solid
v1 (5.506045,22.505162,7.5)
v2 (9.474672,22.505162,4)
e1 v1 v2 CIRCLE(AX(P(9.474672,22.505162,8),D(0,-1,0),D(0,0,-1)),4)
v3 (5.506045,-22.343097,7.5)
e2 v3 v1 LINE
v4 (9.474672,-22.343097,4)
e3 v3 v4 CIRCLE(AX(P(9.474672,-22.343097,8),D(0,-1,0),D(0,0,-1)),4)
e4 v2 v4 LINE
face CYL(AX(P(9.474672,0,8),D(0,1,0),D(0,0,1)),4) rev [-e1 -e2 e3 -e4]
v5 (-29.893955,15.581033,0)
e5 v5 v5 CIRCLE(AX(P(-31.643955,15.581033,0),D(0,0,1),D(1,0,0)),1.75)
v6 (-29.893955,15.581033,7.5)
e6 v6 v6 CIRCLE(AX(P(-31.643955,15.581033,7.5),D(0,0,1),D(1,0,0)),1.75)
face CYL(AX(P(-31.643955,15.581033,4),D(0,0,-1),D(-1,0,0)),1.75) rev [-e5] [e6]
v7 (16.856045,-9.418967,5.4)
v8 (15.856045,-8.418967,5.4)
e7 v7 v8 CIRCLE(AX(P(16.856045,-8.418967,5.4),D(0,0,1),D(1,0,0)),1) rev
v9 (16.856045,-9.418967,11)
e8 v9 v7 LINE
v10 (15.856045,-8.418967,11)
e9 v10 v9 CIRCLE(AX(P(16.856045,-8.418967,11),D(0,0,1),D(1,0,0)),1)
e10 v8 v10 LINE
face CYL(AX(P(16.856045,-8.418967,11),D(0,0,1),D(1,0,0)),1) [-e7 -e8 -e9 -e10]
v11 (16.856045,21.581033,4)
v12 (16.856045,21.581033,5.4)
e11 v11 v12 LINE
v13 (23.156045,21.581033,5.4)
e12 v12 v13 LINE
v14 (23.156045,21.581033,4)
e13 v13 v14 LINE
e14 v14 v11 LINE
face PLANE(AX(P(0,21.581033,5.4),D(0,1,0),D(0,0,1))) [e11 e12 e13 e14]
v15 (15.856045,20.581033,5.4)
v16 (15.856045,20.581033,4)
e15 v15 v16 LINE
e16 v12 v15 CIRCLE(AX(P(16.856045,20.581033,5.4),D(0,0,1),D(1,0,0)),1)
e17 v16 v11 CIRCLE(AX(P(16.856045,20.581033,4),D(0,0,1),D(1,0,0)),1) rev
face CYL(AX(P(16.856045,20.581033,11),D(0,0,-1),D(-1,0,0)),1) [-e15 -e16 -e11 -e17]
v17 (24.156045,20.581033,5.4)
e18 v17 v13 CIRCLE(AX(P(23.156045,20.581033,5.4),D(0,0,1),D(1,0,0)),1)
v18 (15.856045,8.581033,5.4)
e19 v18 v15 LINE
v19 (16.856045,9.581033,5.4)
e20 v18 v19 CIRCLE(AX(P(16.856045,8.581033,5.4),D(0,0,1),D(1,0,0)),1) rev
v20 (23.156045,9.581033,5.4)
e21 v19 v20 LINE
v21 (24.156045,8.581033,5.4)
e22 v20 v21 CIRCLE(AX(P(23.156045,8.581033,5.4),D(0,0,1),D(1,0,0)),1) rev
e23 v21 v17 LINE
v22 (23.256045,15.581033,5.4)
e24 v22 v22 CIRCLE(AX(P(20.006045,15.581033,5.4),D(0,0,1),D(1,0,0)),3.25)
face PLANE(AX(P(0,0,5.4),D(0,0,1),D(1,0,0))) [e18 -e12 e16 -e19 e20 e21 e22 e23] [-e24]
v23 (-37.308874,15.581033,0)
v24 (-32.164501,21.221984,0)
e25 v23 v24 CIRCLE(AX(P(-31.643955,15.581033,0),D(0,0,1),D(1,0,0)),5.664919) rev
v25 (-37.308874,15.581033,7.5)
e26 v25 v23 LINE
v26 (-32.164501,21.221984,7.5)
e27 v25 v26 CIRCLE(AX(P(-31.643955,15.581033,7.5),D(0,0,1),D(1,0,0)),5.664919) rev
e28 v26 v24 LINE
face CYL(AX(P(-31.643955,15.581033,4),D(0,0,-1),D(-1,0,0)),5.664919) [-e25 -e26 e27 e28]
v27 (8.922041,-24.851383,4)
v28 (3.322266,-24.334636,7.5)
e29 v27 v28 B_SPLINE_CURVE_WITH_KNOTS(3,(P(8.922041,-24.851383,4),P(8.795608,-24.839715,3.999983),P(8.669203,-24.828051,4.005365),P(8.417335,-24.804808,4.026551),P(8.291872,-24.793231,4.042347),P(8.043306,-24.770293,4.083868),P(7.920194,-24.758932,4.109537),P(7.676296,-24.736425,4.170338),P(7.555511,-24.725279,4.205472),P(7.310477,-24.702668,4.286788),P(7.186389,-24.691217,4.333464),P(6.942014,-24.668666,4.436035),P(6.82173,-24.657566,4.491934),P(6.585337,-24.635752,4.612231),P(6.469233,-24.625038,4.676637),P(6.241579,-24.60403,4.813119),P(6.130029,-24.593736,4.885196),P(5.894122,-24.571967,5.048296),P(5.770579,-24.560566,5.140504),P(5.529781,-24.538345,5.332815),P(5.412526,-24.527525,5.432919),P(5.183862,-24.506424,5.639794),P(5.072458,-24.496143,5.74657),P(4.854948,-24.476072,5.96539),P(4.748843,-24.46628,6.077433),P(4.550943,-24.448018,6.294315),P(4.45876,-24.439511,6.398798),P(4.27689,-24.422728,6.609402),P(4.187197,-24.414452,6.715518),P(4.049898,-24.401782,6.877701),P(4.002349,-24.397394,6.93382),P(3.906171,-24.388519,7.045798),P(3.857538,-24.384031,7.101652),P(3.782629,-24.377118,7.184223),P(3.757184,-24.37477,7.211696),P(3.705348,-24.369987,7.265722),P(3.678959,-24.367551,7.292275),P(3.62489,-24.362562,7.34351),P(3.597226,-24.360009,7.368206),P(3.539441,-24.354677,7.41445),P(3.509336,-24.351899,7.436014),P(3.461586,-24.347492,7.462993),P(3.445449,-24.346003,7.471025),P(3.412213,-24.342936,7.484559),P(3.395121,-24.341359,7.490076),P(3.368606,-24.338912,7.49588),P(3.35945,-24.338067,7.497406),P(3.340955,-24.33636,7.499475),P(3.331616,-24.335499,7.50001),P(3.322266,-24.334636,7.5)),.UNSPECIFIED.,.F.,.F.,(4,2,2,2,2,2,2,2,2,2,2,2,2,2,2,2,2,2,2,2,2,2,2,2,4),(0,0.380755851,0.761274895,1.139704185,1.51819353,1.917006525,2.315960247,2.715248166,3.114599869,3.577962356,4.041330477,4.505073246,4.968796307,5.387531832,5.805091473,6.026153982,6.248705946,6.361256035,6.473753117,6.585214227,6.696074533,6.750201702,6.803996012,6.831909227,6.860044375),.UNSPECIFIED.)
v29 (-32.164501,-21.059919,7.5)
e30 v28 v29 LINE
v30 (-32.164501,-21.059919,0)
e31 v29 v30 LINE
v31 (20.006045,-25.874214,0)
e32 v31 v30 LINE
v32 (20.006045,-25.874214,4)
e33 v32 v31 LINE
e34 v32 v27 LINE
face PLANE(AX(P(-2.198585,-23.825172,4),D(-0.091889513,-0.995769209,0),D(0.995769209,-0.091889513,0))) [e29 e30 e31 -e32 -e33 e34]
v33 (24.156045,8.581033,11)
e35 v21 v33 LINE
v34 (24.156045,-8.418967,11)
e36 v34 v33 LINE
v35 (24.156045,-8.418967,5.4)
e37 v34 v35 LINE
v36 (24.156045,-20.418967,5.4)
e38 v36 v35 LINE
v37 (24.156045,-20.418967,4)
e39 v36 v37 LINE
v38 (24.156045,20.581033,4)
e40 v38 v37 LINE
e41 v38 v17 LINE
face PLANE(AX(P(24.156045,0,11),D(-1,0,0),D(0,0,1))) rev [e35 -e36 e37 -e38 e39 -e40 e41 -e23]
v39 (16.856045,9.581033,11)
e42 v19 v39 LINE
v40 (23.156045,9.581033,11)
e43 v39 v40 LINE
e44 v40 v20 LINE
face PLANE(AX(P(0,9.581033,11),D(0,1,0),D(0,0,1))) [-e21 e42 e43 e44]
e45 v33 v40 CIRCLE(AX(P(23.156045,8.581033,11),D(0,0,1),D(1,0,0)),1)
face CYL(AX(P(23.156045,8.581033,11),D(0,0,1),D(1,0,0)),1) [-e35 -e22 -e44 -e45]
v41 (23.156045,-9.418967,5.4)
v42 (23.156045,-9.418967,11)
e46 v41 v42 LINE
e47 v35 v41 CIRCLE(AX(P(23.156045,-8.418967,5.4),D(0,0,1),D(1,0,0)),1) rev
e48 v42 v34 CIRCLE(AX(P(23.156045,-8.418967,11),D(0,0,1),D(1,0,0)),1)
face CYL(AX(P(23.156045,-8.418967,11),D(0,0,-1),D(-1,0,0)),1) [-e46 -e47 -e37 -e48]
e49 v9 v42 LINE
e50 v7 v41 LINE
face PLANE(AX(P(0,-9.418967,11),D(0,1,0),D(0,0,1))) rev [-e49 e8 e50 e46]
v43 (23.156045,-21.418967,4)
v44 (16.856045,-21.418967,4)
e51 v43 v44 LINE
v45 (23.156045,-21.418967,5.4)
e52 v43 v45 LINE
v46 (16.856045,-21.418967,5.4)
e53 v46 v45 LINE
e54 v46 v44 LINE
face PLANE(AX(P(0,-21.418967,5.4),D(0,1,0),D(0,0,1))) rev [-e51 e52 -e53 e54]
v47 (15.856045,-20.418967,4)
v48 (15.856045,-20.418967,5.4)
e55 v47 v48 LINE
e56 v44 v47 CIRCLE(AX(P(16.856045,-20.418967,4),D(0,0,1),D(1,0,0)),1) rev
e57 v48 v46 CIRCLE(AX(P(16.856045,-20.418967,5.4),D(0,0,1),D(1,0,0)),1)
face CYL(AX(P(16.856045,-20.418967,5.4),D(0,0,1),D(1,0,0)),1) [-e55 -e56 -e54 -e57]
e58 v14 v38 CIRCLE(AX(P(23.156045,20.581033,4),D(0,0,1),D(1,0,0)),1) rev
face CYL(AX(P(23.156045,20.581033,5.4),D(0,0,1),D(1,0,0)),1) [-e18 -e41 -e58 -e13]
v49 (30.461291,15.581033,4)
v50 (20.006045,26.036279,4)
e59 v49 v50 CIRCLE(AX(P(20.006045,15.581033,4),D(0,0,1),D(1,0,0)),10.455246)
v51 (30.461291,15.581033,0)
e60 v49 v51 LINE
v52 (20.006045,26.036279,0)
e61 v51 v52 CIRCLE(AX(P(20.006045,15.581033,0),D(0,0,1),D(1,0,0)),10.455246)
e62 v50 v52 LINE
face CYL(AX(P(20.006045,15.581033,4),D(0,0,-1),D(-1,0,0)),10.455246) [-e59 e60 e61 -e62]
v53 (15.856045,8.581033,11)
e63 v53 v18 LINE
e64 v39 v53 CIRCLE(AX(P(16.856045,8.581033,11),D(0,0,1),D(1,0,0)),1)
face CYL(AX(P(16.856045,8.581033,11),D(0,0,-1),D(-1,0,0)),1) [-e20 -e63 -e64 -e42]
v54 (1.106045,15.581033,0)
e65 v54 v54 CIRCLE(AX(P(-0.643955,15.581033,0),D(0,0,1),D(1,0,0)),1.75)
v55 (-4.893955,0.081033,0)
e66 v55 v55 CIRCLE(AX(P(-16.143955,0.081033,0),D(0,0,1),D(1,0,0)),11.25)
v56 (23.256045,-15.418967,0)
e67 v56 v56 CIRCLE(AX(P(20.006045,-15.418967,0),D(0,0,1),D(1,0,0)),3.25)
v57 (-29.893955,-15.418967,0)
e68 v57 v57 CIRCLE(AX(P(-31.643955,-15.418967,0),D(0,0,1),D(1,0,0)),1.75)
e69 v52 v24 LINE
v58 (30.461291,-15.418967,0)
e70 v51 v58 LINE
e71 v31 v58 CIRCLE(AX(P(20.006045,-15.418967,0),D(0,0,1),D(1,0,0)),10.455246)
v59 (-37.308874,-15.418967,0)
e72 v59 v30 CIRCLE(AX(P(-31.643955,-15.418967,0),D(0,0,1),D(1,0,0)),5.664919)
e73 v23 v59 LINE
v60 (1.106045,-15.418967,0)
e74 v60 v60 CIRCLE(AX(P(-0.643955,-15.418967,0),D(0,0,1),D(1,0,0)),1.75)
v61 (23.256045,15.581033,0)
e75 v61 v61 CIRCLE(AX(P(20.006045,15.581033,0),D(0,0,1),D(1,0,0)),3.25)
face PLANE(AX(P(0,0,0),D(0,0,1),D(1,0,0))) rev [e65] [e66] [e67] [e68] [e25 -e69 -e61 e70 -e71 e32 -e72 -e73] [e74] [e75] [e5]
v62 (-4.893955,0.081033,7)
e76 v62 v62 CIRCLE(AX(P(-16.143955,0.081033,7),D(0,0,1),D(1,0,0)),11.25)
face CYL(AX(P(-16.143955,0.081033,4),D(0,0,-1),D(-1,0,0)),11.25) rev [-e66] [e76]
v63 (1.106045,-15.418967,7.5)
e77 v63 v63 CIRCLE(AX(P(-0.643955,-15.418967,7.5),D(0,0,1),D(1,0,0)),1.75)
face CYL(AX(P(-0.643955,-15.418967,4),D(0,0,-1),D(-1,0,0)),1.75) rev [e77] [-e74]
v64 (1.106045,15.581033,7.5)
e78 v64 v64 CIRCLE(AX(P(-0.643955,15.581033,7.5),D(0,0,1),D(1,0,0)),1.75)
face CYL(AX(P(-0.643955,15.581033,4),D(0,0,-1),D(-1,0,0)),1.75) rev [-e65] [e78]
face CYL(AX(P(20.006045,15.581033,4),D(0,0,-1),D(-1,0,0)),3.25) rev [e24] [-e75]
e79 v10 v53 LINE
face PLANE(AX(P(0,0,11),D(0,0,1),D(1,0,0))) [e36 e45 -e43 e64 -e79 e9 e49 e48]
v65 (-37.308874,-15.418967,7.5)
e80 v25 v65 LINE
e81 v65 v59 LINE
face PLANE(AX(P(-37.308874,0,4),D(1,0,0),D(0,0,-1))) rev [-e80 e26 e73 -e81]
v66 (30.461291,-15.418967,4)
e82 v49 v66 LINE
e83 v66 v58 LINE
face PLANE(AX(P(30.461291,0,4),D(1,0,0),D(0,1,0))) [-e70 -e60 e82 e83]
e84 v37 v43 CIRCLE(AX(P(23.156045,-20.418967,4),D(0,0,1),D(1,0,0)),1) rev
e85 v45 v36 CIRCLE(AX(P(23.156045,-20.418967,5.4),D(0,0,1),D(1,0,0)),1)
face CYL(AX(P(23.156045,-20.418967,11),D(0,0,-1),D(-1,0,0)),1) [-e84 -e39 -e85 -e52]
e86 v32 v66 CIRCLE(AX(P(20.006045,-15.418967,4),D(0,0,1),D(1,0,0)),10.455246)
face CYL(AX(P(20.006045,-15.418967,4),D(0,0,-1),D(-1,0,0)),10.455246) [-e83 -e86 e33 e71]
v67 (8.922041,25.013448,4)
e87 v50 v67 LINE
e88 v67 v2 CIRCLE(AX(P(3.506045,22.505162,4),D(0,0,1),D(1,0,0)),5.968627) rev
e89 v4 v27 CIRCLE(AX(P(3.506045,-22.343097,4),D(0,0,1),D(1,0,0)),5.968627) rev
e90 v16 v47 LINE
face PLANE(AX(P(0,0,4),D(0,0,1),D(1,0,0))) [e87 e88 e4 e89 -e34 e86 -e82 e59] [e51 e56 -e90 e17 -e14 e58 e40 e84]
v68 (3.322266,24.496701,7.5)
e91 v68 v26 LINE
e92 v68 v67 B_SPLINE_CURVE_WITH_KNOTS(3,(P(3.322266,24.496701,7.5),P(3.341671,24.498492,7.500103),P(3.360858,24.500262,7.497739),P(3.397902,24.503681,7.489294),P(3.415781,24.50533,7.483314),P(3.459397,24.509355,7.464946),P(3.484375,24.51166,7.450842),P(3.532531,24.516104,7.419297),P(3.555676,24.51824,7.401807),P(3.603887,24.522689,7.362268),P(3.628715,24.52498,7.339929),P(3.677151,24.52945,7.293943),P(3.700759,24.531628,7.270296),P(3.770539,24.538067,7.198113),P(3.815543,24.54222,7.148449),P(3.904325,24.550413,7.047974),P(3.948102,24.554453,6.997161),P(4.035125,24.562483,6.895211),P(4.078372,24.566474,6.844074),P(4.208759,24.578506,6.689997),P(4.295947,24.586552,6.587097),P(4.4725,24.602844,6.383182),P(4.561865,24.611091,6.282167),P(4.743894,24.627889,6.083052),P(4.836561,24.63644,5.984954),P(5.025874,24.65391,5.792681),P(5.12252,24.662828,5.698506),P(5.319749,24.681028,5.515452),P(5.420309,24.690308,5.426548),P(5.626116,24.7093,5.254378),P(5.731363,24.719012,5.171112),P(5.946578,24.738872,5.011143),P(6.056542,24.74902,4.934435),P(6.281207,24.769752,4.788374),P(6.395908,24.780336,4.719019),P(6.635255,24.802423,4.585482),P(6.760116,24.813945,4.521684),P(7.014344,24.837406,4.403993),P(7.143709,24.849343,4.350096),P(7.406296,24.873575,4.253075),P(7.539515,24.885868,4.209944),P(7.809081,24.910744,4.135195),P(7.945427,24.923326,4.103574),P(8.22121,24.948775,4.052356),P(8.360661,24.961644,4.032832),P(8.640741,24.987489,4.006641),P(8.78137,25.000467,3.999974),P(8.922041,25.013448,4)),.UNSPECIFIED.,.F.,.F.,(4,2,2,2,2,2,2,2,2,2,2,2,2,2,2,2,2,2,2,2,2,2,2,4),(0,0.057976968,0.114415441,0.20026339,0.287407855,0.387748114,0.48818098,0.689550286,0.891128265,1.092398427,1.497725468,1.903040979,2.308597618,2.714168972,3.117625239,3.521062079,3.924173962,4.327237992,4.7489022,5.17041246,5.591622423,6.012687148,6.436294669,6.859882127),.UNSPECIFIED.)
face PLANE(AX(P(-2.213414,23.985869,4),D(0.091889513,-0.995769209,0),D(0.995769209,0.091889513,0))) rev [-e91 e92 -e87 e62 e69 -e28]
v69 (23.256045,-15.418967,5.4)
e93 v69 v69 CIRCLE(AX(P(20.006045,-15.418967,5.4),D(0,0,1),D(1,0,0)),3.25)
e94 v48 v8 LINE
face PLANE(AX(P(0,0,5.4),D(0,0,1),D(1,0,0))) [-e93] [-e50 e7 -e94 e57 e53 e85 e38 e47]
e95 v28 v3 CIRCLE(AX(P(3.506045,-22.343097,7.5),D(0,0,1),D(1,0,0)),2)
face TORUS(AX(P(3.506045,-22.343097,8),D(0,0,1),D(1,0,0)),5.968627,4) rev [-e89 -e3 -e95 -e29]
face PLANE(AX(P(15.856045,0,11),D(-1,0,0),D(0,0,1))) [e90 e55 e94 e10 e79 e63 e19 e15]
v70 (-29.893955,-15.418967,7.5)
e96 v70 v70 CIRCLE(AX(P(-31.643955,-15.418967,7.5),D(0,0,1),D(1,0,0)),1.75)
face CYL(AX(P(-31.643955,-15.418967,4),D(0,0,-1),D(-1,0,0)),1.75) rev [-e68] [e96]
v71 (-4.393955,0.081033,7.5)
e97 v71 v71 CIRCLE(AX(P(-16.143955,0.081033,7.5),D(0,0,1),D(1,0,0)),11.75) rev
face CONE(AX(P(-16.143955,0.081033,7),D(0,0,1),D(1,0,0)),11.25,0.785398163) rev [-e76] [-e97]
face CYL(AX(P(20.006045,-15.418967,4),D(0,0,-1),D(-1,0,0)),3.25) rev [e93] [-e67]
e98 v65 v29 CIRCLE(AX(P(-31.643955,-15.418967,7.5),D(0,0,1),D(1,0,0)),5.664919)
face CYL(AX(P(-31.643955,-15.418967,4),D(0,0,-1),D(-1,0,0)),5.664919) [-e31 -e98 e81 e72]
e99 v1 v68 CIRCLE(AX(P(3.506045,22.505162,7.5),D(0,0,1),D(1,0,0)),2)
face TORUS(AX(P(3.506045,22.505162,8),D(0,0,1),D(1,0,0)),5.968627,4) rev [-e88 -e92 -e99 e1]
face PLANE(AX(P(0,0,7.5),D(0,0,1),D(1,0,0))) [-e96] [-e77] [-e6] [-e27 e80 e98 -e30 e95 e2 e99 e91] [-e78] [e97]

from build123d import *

# Parameters (mm, degrees)
SKETCH_1_R      = 1.7500000000000004
SKETCH_1_R_2    = 1.7499999999999998
SKETCH_1_R_3    = 11.25
SKETCH_1_R_4    = 3.2500000000000004
EXTRUDE_1_DEPTH = 4
SKETCH_1_3_R    = 1.7500000000000004
SKETCH_1_3_R_2  = 1.7499999999999998
SKETCH_1_3_R_3  = 11.25
EXTRUDE_2_DEPTH = 7.5
SKETCH_1_4_W    = 8.299999999999999
SKETCH_1_4_H    = 18.999999999999982
EXTRUDE_3_DEPTH = 11
FILLET_1_R      = 2
FILLET_3_R      = 4
SKETCH_1_5_W    = 8.299999999999999
SKETCH_1_5_H    = 12
SKETCH_1_5_R    = 3.2500000000000004
SKETCH_1_5_H_2  = 11.999999999999996
SKETCH_1_5_H_3  = 18.999999999999982
EXTRUDE_4_DEPTH = 5.4
FILLET_2_R      = 1
CHAMFER_1_SIZE  = 0.5


with BuildPart() as part:
    # Эскиз1 → Бобышка-Вытянуть1 (new body)
    with BuildSketch(Plane.XY):
        with BuildLine():
            ThreePointArc((-32.16450146827534, 21.221984437073093), (-35.82965440560809, 19.39826009426678), (-37.30887383412098, 15.581032511990193))
            Line((-37.30887383412098, 15.581032511990193), (-37.30887383412098, -15.418967488009775))
            ThreePointArc((-37.30887383412098, -15.418967488009775), (-35.829654405608096, -19.23619507028637), (-32.16450146827534, -21.059919413092672))
            Line((-32.16450146827534, -21.059919413092672), (20.006045179765074, -25.87421379899061))
            ThreePointArc((20.006045179765074, -25.87421379899061), (27.399020745235244, -22.811943053479965), (30.46129149074589, -15.41896748800979))
            Line((30.46129149074589, -15.418967488009791), (30.461291490745886, 15.581032511990195))
            ThreePointArc((30.461291490745886, 15.581032511990195), (27.39902074523524, 22.97400807746036), (20.006045179765074, 26.036278822971013))
            Line((20.006045179765074, 26.036278822971013), (-32.16450146827534, 21.221984437073093))
        make_face()
        with Locations((-31.643954820235436, -15.418967488009791)):
            Circle(SKETCH_1_R, mode=Mode.SUBTRACT)
        with Locations((-0.643954820235465, -15.418967488009791)):
            Circle(SKETCH_1_R_2, mode=Mode.SUBTRACT)
        with Locations((-16.14395482023548, 0.08103251199020889)):
            Circle(SKETCH_1_R_3, mode=Mode.SUBTRACT)
        with Locations((-31.643954820235436, 15.581032511990195)):
            Circle(SKETCH_1_R, mode=Mode.SUBTRACT)
        with Locations((-0.643954820235465, 15.581032511990195)):
            Circle(SKETCH_1_R, mode=Mode.SUBTRACT)
        with Locations((20.006045179765074, -15.418967488009791)):
            Circle(SKETCH_1_R_4, mode=Mode.SUBTRACT)
        with Locations((20.00604517976507, 15.581032511990195)):
            Circle(SKETCH_1_R_4, mode=Mode.SUBTRACT)
    extrude(amount=EXTRUDE_1_DEPTH)

    # Эскиз1<3> → Бобышка-Вытянуть2 (add)
    with BuildSketch(Plane.XY):
        with BuildLine():
            ThreePointArc((-32.16450146827534, 21.221984437073093), (-35.82965440560809, 19.39826009426678), (-37.30887383412098, 15.581032511990193))
            Line((-37.30887383412098, 15.581032511990193), (-37.30887383412098, -15.418967488009775))
            ThreePointArc((-37.30887383412098, -15.418967488009775), (-35.829654405608096, -19.23619507028637), (-32.16450146827534, -21.059919413092672))
            Line((-32.16450146827533, -21.059919413092675), (5.506045179765067, -24.536154815893063))
            Line((5.506045179765067, -24.536154815893056), (5.506045179765067, 24.698219839873474))
            Line((5.506045179765069, 24.698219839873467), (-32.16450146827534, 21.221984437073093))
        make_face()
        with Locations((-31.643954820235436, -15.418967488009791)):
            Circle(SKETCH_1_3_R, mode=Mode.SUBTRACT)
        with Locations((-0.643954820235465, -15.418967488009791)):
            Circle(SKETCH_1_3_R_2, mode=Mode.SUBTRACT)
        with Locations((-16.14395482023548, 0.08103251199020889)):
            Circle(SKETCH_1_3_R_3, mode=Mode.SUBTRACT)
        with Locations((-31.643954820235436, 15.581032511990195)):
            Circle(SKETCH_1_3_R, mode=Mode.SUBTRACT)
        with Locations((-0.643954820235465, 15.581032511990195)):
            Circle(SKETCH_1_3_R, mode=Mode.SUBTRACT)
    extrude(amount=EXTRUDE_2_DEPTH)

    # Эскиз1<4> → Бобышка-Вытянуть3 (add)
    with BuildSketch(Plane.XY):
        with Locations((20.00604517976507, 0.08103251199020356)):
            Rectangle(SKETCH_1_4_W, SKETCH_1_4_H)
    extrude(amount=EXTRUDE_3_DEPTH)

    # Скругление1
    fillet_1_edges = [part.edges().sort_by_distance(p)[0] for p in [
        (5.506045179765067, -24.53615481589306, 5.75),
        (5.506045179765068, 24.69821983987347, 5.75),
    ]]
    fillet(fillet_1_edges, radius=FILLET_1_R)

    # Скругление3
    # the kernel refuses this fillet: 4 mm, written as the material it adds along each edge
    with BuildSketch(Plane(origin=(3.506045179765067, 22.505162446697916, 4), x_dir=(0.9999802608561372, -0.006283143965559292, 0), z_dir=(0.006283143965559292, 0.9999802608561372, 0))) as fillet_3_piece_1_section:
        with BuildLine():
            CenterArc((5.968626966596891, -4.000000000000001), FILLET_3_R, 90, 82.81924421854171)
            Line((5.968626966596891, 0), (1.9999999999999991, 0))
            Line((1.9999999999999991, 0), (2.0000000000000044, -3.5000000000000018))
        make_face()
    fillet_3_piece_1 = revolve(axis=Axis((3.506045179765067, 22.505162446697916, 4), (0, 0, -1)), revolution_arc=359.64, mode=Mode.PRIVATE)
    fillet_3_piece_1 = split(fillet_3_piece_1, bisect_by=Plane(origin=(3.3222661542347938, 24.49670086454859, 4), z_dir=(0.09188951276513632, -0.9957692089253342, 0)), keep=Keep.TOP, mode=Mode.PRIVATE)
    add(fillet_3_piece_1)
    with BuildSketch(Plane(origin=(5.506045179765067, 22.505162446697916, 4), x_dir=(1.78e-15, 0, 1), z_dir=(0, -1, 0))) as fillet_3_piece_2:
        with BuildLine():
            CenterArc((4.000000000000007, -3.9686269665968847), FILLET_3_R, 97.18075578145837, 82.81924421854171)
            Line((7.05e-15, -3.968626966596892), (0, 0))
            Line((0, 0), (3.500000000000001, 0))
        make_face()
    extrude(amount=44.84825986941543)
    with BuildSketch(Plane(origin=(3.506045179765067, -22.343097422717513, 4), x_dir=(1, 0, 0), z_dir=(0, 1, 0))) as fillet_3_piece_3_section:
        with BuildLine():
            CenterArc((5.968626966596892, -4), FILLET_3_R, 90, 82.81924421854171)
            Line((5.968626966596892, 0), (2, 0))
            Line((2, 0), (2.0000000000000044, -3.500000000000001))
        make_face()
    fillet_3_piece_3 = revolve(axis=Axis((3.506045179765067, -22.343097422717513, 4), (0, 0, -1)), revolution_arc=359.64000000000004, mode=Mode.PRIVATE)
    fillet_3_piece_3 = split(fillet_3_piece_3, bisect_by=Plane(origin=(3.322266154234794, -24.33463584056818, 4), z_dir=(0.09188951276513666, 0.9957692089253342, 0)), keep=Keep.TOP, mode=Mode.PRIVATE)
    add(fillet_3_piece_3)

    # Эскиз1<5> → Бобышка-Вытянуть4 (add)
    # profile 1 of 3: a face of its own
    with BuildSketch(Plane.XY):
        with Locations((20.00604517976507, 15.581032511990195)):
            Rectangle(SKETCH_1_5_W, SKETCH_1_5_H)
        with Locations((20.00604517976507, 15.581032511990195)):
            Circle(SKETCH_1_5_R, mode=Mode.SUBTRACT)
    # profile 2 of 3: a face of its own
    with BuildSketch(Plane.XY):
        with Locations((20.00604517976507, -15.418967488009786)):
            Rectangle(SKETCH_1_5_W, SKETCH_1_5_H_2)
        with Locations((20.006045179765074, -15.418967488009791)):
            Circle(SKETCH_1_5_R, mode=Mode.SUBTRACT)
    # profile 3 of 3: a face of its own
    with BuildSketch(Plane.XY):
        with Locations((20.00604517976507, 0.08103251199020356)):
            Rectangle(SKETCH_1_5_W, SKETCH_1_5_H_3)
    extrude(amount=EXTRUDE_4_DEPTH)

    # Скругление2
    fillet_2_edges = [part.edges().sort_by_distance(p)[0] for p in [
        (15.85604517976507, 21.581032511990195, 4.7),
        (24.15604517976507, -21.418967488009784, 4.7),
        (15.85604517976507, -21.418967488009784, 4.7),
        (24.15604517976507, 21.581032511990195, 4.7),
        (15.85604517976507, -9.418967488009788, 8.2),
        (24.15604517976507, -9.418967488009788, 8.2),
        (24.15604517976507, 9.581032511990195, 8.2),
        (15.85604517976507, 9.581032511990195, 8.2),
    ]]
    fillet(fillet_2_edges, radius=FILLET_2_R)

    # Фаска1
    chamfer_1_edges = [part.edges().sort_by_distance(p)[0] for p in [
        (-27.39395482023548, 0.08103251199021026, 7.5),
    ]]
    chamfer(chamfer_1_edges, length=CHAMFER_1_SIZE)


solid = part.part
